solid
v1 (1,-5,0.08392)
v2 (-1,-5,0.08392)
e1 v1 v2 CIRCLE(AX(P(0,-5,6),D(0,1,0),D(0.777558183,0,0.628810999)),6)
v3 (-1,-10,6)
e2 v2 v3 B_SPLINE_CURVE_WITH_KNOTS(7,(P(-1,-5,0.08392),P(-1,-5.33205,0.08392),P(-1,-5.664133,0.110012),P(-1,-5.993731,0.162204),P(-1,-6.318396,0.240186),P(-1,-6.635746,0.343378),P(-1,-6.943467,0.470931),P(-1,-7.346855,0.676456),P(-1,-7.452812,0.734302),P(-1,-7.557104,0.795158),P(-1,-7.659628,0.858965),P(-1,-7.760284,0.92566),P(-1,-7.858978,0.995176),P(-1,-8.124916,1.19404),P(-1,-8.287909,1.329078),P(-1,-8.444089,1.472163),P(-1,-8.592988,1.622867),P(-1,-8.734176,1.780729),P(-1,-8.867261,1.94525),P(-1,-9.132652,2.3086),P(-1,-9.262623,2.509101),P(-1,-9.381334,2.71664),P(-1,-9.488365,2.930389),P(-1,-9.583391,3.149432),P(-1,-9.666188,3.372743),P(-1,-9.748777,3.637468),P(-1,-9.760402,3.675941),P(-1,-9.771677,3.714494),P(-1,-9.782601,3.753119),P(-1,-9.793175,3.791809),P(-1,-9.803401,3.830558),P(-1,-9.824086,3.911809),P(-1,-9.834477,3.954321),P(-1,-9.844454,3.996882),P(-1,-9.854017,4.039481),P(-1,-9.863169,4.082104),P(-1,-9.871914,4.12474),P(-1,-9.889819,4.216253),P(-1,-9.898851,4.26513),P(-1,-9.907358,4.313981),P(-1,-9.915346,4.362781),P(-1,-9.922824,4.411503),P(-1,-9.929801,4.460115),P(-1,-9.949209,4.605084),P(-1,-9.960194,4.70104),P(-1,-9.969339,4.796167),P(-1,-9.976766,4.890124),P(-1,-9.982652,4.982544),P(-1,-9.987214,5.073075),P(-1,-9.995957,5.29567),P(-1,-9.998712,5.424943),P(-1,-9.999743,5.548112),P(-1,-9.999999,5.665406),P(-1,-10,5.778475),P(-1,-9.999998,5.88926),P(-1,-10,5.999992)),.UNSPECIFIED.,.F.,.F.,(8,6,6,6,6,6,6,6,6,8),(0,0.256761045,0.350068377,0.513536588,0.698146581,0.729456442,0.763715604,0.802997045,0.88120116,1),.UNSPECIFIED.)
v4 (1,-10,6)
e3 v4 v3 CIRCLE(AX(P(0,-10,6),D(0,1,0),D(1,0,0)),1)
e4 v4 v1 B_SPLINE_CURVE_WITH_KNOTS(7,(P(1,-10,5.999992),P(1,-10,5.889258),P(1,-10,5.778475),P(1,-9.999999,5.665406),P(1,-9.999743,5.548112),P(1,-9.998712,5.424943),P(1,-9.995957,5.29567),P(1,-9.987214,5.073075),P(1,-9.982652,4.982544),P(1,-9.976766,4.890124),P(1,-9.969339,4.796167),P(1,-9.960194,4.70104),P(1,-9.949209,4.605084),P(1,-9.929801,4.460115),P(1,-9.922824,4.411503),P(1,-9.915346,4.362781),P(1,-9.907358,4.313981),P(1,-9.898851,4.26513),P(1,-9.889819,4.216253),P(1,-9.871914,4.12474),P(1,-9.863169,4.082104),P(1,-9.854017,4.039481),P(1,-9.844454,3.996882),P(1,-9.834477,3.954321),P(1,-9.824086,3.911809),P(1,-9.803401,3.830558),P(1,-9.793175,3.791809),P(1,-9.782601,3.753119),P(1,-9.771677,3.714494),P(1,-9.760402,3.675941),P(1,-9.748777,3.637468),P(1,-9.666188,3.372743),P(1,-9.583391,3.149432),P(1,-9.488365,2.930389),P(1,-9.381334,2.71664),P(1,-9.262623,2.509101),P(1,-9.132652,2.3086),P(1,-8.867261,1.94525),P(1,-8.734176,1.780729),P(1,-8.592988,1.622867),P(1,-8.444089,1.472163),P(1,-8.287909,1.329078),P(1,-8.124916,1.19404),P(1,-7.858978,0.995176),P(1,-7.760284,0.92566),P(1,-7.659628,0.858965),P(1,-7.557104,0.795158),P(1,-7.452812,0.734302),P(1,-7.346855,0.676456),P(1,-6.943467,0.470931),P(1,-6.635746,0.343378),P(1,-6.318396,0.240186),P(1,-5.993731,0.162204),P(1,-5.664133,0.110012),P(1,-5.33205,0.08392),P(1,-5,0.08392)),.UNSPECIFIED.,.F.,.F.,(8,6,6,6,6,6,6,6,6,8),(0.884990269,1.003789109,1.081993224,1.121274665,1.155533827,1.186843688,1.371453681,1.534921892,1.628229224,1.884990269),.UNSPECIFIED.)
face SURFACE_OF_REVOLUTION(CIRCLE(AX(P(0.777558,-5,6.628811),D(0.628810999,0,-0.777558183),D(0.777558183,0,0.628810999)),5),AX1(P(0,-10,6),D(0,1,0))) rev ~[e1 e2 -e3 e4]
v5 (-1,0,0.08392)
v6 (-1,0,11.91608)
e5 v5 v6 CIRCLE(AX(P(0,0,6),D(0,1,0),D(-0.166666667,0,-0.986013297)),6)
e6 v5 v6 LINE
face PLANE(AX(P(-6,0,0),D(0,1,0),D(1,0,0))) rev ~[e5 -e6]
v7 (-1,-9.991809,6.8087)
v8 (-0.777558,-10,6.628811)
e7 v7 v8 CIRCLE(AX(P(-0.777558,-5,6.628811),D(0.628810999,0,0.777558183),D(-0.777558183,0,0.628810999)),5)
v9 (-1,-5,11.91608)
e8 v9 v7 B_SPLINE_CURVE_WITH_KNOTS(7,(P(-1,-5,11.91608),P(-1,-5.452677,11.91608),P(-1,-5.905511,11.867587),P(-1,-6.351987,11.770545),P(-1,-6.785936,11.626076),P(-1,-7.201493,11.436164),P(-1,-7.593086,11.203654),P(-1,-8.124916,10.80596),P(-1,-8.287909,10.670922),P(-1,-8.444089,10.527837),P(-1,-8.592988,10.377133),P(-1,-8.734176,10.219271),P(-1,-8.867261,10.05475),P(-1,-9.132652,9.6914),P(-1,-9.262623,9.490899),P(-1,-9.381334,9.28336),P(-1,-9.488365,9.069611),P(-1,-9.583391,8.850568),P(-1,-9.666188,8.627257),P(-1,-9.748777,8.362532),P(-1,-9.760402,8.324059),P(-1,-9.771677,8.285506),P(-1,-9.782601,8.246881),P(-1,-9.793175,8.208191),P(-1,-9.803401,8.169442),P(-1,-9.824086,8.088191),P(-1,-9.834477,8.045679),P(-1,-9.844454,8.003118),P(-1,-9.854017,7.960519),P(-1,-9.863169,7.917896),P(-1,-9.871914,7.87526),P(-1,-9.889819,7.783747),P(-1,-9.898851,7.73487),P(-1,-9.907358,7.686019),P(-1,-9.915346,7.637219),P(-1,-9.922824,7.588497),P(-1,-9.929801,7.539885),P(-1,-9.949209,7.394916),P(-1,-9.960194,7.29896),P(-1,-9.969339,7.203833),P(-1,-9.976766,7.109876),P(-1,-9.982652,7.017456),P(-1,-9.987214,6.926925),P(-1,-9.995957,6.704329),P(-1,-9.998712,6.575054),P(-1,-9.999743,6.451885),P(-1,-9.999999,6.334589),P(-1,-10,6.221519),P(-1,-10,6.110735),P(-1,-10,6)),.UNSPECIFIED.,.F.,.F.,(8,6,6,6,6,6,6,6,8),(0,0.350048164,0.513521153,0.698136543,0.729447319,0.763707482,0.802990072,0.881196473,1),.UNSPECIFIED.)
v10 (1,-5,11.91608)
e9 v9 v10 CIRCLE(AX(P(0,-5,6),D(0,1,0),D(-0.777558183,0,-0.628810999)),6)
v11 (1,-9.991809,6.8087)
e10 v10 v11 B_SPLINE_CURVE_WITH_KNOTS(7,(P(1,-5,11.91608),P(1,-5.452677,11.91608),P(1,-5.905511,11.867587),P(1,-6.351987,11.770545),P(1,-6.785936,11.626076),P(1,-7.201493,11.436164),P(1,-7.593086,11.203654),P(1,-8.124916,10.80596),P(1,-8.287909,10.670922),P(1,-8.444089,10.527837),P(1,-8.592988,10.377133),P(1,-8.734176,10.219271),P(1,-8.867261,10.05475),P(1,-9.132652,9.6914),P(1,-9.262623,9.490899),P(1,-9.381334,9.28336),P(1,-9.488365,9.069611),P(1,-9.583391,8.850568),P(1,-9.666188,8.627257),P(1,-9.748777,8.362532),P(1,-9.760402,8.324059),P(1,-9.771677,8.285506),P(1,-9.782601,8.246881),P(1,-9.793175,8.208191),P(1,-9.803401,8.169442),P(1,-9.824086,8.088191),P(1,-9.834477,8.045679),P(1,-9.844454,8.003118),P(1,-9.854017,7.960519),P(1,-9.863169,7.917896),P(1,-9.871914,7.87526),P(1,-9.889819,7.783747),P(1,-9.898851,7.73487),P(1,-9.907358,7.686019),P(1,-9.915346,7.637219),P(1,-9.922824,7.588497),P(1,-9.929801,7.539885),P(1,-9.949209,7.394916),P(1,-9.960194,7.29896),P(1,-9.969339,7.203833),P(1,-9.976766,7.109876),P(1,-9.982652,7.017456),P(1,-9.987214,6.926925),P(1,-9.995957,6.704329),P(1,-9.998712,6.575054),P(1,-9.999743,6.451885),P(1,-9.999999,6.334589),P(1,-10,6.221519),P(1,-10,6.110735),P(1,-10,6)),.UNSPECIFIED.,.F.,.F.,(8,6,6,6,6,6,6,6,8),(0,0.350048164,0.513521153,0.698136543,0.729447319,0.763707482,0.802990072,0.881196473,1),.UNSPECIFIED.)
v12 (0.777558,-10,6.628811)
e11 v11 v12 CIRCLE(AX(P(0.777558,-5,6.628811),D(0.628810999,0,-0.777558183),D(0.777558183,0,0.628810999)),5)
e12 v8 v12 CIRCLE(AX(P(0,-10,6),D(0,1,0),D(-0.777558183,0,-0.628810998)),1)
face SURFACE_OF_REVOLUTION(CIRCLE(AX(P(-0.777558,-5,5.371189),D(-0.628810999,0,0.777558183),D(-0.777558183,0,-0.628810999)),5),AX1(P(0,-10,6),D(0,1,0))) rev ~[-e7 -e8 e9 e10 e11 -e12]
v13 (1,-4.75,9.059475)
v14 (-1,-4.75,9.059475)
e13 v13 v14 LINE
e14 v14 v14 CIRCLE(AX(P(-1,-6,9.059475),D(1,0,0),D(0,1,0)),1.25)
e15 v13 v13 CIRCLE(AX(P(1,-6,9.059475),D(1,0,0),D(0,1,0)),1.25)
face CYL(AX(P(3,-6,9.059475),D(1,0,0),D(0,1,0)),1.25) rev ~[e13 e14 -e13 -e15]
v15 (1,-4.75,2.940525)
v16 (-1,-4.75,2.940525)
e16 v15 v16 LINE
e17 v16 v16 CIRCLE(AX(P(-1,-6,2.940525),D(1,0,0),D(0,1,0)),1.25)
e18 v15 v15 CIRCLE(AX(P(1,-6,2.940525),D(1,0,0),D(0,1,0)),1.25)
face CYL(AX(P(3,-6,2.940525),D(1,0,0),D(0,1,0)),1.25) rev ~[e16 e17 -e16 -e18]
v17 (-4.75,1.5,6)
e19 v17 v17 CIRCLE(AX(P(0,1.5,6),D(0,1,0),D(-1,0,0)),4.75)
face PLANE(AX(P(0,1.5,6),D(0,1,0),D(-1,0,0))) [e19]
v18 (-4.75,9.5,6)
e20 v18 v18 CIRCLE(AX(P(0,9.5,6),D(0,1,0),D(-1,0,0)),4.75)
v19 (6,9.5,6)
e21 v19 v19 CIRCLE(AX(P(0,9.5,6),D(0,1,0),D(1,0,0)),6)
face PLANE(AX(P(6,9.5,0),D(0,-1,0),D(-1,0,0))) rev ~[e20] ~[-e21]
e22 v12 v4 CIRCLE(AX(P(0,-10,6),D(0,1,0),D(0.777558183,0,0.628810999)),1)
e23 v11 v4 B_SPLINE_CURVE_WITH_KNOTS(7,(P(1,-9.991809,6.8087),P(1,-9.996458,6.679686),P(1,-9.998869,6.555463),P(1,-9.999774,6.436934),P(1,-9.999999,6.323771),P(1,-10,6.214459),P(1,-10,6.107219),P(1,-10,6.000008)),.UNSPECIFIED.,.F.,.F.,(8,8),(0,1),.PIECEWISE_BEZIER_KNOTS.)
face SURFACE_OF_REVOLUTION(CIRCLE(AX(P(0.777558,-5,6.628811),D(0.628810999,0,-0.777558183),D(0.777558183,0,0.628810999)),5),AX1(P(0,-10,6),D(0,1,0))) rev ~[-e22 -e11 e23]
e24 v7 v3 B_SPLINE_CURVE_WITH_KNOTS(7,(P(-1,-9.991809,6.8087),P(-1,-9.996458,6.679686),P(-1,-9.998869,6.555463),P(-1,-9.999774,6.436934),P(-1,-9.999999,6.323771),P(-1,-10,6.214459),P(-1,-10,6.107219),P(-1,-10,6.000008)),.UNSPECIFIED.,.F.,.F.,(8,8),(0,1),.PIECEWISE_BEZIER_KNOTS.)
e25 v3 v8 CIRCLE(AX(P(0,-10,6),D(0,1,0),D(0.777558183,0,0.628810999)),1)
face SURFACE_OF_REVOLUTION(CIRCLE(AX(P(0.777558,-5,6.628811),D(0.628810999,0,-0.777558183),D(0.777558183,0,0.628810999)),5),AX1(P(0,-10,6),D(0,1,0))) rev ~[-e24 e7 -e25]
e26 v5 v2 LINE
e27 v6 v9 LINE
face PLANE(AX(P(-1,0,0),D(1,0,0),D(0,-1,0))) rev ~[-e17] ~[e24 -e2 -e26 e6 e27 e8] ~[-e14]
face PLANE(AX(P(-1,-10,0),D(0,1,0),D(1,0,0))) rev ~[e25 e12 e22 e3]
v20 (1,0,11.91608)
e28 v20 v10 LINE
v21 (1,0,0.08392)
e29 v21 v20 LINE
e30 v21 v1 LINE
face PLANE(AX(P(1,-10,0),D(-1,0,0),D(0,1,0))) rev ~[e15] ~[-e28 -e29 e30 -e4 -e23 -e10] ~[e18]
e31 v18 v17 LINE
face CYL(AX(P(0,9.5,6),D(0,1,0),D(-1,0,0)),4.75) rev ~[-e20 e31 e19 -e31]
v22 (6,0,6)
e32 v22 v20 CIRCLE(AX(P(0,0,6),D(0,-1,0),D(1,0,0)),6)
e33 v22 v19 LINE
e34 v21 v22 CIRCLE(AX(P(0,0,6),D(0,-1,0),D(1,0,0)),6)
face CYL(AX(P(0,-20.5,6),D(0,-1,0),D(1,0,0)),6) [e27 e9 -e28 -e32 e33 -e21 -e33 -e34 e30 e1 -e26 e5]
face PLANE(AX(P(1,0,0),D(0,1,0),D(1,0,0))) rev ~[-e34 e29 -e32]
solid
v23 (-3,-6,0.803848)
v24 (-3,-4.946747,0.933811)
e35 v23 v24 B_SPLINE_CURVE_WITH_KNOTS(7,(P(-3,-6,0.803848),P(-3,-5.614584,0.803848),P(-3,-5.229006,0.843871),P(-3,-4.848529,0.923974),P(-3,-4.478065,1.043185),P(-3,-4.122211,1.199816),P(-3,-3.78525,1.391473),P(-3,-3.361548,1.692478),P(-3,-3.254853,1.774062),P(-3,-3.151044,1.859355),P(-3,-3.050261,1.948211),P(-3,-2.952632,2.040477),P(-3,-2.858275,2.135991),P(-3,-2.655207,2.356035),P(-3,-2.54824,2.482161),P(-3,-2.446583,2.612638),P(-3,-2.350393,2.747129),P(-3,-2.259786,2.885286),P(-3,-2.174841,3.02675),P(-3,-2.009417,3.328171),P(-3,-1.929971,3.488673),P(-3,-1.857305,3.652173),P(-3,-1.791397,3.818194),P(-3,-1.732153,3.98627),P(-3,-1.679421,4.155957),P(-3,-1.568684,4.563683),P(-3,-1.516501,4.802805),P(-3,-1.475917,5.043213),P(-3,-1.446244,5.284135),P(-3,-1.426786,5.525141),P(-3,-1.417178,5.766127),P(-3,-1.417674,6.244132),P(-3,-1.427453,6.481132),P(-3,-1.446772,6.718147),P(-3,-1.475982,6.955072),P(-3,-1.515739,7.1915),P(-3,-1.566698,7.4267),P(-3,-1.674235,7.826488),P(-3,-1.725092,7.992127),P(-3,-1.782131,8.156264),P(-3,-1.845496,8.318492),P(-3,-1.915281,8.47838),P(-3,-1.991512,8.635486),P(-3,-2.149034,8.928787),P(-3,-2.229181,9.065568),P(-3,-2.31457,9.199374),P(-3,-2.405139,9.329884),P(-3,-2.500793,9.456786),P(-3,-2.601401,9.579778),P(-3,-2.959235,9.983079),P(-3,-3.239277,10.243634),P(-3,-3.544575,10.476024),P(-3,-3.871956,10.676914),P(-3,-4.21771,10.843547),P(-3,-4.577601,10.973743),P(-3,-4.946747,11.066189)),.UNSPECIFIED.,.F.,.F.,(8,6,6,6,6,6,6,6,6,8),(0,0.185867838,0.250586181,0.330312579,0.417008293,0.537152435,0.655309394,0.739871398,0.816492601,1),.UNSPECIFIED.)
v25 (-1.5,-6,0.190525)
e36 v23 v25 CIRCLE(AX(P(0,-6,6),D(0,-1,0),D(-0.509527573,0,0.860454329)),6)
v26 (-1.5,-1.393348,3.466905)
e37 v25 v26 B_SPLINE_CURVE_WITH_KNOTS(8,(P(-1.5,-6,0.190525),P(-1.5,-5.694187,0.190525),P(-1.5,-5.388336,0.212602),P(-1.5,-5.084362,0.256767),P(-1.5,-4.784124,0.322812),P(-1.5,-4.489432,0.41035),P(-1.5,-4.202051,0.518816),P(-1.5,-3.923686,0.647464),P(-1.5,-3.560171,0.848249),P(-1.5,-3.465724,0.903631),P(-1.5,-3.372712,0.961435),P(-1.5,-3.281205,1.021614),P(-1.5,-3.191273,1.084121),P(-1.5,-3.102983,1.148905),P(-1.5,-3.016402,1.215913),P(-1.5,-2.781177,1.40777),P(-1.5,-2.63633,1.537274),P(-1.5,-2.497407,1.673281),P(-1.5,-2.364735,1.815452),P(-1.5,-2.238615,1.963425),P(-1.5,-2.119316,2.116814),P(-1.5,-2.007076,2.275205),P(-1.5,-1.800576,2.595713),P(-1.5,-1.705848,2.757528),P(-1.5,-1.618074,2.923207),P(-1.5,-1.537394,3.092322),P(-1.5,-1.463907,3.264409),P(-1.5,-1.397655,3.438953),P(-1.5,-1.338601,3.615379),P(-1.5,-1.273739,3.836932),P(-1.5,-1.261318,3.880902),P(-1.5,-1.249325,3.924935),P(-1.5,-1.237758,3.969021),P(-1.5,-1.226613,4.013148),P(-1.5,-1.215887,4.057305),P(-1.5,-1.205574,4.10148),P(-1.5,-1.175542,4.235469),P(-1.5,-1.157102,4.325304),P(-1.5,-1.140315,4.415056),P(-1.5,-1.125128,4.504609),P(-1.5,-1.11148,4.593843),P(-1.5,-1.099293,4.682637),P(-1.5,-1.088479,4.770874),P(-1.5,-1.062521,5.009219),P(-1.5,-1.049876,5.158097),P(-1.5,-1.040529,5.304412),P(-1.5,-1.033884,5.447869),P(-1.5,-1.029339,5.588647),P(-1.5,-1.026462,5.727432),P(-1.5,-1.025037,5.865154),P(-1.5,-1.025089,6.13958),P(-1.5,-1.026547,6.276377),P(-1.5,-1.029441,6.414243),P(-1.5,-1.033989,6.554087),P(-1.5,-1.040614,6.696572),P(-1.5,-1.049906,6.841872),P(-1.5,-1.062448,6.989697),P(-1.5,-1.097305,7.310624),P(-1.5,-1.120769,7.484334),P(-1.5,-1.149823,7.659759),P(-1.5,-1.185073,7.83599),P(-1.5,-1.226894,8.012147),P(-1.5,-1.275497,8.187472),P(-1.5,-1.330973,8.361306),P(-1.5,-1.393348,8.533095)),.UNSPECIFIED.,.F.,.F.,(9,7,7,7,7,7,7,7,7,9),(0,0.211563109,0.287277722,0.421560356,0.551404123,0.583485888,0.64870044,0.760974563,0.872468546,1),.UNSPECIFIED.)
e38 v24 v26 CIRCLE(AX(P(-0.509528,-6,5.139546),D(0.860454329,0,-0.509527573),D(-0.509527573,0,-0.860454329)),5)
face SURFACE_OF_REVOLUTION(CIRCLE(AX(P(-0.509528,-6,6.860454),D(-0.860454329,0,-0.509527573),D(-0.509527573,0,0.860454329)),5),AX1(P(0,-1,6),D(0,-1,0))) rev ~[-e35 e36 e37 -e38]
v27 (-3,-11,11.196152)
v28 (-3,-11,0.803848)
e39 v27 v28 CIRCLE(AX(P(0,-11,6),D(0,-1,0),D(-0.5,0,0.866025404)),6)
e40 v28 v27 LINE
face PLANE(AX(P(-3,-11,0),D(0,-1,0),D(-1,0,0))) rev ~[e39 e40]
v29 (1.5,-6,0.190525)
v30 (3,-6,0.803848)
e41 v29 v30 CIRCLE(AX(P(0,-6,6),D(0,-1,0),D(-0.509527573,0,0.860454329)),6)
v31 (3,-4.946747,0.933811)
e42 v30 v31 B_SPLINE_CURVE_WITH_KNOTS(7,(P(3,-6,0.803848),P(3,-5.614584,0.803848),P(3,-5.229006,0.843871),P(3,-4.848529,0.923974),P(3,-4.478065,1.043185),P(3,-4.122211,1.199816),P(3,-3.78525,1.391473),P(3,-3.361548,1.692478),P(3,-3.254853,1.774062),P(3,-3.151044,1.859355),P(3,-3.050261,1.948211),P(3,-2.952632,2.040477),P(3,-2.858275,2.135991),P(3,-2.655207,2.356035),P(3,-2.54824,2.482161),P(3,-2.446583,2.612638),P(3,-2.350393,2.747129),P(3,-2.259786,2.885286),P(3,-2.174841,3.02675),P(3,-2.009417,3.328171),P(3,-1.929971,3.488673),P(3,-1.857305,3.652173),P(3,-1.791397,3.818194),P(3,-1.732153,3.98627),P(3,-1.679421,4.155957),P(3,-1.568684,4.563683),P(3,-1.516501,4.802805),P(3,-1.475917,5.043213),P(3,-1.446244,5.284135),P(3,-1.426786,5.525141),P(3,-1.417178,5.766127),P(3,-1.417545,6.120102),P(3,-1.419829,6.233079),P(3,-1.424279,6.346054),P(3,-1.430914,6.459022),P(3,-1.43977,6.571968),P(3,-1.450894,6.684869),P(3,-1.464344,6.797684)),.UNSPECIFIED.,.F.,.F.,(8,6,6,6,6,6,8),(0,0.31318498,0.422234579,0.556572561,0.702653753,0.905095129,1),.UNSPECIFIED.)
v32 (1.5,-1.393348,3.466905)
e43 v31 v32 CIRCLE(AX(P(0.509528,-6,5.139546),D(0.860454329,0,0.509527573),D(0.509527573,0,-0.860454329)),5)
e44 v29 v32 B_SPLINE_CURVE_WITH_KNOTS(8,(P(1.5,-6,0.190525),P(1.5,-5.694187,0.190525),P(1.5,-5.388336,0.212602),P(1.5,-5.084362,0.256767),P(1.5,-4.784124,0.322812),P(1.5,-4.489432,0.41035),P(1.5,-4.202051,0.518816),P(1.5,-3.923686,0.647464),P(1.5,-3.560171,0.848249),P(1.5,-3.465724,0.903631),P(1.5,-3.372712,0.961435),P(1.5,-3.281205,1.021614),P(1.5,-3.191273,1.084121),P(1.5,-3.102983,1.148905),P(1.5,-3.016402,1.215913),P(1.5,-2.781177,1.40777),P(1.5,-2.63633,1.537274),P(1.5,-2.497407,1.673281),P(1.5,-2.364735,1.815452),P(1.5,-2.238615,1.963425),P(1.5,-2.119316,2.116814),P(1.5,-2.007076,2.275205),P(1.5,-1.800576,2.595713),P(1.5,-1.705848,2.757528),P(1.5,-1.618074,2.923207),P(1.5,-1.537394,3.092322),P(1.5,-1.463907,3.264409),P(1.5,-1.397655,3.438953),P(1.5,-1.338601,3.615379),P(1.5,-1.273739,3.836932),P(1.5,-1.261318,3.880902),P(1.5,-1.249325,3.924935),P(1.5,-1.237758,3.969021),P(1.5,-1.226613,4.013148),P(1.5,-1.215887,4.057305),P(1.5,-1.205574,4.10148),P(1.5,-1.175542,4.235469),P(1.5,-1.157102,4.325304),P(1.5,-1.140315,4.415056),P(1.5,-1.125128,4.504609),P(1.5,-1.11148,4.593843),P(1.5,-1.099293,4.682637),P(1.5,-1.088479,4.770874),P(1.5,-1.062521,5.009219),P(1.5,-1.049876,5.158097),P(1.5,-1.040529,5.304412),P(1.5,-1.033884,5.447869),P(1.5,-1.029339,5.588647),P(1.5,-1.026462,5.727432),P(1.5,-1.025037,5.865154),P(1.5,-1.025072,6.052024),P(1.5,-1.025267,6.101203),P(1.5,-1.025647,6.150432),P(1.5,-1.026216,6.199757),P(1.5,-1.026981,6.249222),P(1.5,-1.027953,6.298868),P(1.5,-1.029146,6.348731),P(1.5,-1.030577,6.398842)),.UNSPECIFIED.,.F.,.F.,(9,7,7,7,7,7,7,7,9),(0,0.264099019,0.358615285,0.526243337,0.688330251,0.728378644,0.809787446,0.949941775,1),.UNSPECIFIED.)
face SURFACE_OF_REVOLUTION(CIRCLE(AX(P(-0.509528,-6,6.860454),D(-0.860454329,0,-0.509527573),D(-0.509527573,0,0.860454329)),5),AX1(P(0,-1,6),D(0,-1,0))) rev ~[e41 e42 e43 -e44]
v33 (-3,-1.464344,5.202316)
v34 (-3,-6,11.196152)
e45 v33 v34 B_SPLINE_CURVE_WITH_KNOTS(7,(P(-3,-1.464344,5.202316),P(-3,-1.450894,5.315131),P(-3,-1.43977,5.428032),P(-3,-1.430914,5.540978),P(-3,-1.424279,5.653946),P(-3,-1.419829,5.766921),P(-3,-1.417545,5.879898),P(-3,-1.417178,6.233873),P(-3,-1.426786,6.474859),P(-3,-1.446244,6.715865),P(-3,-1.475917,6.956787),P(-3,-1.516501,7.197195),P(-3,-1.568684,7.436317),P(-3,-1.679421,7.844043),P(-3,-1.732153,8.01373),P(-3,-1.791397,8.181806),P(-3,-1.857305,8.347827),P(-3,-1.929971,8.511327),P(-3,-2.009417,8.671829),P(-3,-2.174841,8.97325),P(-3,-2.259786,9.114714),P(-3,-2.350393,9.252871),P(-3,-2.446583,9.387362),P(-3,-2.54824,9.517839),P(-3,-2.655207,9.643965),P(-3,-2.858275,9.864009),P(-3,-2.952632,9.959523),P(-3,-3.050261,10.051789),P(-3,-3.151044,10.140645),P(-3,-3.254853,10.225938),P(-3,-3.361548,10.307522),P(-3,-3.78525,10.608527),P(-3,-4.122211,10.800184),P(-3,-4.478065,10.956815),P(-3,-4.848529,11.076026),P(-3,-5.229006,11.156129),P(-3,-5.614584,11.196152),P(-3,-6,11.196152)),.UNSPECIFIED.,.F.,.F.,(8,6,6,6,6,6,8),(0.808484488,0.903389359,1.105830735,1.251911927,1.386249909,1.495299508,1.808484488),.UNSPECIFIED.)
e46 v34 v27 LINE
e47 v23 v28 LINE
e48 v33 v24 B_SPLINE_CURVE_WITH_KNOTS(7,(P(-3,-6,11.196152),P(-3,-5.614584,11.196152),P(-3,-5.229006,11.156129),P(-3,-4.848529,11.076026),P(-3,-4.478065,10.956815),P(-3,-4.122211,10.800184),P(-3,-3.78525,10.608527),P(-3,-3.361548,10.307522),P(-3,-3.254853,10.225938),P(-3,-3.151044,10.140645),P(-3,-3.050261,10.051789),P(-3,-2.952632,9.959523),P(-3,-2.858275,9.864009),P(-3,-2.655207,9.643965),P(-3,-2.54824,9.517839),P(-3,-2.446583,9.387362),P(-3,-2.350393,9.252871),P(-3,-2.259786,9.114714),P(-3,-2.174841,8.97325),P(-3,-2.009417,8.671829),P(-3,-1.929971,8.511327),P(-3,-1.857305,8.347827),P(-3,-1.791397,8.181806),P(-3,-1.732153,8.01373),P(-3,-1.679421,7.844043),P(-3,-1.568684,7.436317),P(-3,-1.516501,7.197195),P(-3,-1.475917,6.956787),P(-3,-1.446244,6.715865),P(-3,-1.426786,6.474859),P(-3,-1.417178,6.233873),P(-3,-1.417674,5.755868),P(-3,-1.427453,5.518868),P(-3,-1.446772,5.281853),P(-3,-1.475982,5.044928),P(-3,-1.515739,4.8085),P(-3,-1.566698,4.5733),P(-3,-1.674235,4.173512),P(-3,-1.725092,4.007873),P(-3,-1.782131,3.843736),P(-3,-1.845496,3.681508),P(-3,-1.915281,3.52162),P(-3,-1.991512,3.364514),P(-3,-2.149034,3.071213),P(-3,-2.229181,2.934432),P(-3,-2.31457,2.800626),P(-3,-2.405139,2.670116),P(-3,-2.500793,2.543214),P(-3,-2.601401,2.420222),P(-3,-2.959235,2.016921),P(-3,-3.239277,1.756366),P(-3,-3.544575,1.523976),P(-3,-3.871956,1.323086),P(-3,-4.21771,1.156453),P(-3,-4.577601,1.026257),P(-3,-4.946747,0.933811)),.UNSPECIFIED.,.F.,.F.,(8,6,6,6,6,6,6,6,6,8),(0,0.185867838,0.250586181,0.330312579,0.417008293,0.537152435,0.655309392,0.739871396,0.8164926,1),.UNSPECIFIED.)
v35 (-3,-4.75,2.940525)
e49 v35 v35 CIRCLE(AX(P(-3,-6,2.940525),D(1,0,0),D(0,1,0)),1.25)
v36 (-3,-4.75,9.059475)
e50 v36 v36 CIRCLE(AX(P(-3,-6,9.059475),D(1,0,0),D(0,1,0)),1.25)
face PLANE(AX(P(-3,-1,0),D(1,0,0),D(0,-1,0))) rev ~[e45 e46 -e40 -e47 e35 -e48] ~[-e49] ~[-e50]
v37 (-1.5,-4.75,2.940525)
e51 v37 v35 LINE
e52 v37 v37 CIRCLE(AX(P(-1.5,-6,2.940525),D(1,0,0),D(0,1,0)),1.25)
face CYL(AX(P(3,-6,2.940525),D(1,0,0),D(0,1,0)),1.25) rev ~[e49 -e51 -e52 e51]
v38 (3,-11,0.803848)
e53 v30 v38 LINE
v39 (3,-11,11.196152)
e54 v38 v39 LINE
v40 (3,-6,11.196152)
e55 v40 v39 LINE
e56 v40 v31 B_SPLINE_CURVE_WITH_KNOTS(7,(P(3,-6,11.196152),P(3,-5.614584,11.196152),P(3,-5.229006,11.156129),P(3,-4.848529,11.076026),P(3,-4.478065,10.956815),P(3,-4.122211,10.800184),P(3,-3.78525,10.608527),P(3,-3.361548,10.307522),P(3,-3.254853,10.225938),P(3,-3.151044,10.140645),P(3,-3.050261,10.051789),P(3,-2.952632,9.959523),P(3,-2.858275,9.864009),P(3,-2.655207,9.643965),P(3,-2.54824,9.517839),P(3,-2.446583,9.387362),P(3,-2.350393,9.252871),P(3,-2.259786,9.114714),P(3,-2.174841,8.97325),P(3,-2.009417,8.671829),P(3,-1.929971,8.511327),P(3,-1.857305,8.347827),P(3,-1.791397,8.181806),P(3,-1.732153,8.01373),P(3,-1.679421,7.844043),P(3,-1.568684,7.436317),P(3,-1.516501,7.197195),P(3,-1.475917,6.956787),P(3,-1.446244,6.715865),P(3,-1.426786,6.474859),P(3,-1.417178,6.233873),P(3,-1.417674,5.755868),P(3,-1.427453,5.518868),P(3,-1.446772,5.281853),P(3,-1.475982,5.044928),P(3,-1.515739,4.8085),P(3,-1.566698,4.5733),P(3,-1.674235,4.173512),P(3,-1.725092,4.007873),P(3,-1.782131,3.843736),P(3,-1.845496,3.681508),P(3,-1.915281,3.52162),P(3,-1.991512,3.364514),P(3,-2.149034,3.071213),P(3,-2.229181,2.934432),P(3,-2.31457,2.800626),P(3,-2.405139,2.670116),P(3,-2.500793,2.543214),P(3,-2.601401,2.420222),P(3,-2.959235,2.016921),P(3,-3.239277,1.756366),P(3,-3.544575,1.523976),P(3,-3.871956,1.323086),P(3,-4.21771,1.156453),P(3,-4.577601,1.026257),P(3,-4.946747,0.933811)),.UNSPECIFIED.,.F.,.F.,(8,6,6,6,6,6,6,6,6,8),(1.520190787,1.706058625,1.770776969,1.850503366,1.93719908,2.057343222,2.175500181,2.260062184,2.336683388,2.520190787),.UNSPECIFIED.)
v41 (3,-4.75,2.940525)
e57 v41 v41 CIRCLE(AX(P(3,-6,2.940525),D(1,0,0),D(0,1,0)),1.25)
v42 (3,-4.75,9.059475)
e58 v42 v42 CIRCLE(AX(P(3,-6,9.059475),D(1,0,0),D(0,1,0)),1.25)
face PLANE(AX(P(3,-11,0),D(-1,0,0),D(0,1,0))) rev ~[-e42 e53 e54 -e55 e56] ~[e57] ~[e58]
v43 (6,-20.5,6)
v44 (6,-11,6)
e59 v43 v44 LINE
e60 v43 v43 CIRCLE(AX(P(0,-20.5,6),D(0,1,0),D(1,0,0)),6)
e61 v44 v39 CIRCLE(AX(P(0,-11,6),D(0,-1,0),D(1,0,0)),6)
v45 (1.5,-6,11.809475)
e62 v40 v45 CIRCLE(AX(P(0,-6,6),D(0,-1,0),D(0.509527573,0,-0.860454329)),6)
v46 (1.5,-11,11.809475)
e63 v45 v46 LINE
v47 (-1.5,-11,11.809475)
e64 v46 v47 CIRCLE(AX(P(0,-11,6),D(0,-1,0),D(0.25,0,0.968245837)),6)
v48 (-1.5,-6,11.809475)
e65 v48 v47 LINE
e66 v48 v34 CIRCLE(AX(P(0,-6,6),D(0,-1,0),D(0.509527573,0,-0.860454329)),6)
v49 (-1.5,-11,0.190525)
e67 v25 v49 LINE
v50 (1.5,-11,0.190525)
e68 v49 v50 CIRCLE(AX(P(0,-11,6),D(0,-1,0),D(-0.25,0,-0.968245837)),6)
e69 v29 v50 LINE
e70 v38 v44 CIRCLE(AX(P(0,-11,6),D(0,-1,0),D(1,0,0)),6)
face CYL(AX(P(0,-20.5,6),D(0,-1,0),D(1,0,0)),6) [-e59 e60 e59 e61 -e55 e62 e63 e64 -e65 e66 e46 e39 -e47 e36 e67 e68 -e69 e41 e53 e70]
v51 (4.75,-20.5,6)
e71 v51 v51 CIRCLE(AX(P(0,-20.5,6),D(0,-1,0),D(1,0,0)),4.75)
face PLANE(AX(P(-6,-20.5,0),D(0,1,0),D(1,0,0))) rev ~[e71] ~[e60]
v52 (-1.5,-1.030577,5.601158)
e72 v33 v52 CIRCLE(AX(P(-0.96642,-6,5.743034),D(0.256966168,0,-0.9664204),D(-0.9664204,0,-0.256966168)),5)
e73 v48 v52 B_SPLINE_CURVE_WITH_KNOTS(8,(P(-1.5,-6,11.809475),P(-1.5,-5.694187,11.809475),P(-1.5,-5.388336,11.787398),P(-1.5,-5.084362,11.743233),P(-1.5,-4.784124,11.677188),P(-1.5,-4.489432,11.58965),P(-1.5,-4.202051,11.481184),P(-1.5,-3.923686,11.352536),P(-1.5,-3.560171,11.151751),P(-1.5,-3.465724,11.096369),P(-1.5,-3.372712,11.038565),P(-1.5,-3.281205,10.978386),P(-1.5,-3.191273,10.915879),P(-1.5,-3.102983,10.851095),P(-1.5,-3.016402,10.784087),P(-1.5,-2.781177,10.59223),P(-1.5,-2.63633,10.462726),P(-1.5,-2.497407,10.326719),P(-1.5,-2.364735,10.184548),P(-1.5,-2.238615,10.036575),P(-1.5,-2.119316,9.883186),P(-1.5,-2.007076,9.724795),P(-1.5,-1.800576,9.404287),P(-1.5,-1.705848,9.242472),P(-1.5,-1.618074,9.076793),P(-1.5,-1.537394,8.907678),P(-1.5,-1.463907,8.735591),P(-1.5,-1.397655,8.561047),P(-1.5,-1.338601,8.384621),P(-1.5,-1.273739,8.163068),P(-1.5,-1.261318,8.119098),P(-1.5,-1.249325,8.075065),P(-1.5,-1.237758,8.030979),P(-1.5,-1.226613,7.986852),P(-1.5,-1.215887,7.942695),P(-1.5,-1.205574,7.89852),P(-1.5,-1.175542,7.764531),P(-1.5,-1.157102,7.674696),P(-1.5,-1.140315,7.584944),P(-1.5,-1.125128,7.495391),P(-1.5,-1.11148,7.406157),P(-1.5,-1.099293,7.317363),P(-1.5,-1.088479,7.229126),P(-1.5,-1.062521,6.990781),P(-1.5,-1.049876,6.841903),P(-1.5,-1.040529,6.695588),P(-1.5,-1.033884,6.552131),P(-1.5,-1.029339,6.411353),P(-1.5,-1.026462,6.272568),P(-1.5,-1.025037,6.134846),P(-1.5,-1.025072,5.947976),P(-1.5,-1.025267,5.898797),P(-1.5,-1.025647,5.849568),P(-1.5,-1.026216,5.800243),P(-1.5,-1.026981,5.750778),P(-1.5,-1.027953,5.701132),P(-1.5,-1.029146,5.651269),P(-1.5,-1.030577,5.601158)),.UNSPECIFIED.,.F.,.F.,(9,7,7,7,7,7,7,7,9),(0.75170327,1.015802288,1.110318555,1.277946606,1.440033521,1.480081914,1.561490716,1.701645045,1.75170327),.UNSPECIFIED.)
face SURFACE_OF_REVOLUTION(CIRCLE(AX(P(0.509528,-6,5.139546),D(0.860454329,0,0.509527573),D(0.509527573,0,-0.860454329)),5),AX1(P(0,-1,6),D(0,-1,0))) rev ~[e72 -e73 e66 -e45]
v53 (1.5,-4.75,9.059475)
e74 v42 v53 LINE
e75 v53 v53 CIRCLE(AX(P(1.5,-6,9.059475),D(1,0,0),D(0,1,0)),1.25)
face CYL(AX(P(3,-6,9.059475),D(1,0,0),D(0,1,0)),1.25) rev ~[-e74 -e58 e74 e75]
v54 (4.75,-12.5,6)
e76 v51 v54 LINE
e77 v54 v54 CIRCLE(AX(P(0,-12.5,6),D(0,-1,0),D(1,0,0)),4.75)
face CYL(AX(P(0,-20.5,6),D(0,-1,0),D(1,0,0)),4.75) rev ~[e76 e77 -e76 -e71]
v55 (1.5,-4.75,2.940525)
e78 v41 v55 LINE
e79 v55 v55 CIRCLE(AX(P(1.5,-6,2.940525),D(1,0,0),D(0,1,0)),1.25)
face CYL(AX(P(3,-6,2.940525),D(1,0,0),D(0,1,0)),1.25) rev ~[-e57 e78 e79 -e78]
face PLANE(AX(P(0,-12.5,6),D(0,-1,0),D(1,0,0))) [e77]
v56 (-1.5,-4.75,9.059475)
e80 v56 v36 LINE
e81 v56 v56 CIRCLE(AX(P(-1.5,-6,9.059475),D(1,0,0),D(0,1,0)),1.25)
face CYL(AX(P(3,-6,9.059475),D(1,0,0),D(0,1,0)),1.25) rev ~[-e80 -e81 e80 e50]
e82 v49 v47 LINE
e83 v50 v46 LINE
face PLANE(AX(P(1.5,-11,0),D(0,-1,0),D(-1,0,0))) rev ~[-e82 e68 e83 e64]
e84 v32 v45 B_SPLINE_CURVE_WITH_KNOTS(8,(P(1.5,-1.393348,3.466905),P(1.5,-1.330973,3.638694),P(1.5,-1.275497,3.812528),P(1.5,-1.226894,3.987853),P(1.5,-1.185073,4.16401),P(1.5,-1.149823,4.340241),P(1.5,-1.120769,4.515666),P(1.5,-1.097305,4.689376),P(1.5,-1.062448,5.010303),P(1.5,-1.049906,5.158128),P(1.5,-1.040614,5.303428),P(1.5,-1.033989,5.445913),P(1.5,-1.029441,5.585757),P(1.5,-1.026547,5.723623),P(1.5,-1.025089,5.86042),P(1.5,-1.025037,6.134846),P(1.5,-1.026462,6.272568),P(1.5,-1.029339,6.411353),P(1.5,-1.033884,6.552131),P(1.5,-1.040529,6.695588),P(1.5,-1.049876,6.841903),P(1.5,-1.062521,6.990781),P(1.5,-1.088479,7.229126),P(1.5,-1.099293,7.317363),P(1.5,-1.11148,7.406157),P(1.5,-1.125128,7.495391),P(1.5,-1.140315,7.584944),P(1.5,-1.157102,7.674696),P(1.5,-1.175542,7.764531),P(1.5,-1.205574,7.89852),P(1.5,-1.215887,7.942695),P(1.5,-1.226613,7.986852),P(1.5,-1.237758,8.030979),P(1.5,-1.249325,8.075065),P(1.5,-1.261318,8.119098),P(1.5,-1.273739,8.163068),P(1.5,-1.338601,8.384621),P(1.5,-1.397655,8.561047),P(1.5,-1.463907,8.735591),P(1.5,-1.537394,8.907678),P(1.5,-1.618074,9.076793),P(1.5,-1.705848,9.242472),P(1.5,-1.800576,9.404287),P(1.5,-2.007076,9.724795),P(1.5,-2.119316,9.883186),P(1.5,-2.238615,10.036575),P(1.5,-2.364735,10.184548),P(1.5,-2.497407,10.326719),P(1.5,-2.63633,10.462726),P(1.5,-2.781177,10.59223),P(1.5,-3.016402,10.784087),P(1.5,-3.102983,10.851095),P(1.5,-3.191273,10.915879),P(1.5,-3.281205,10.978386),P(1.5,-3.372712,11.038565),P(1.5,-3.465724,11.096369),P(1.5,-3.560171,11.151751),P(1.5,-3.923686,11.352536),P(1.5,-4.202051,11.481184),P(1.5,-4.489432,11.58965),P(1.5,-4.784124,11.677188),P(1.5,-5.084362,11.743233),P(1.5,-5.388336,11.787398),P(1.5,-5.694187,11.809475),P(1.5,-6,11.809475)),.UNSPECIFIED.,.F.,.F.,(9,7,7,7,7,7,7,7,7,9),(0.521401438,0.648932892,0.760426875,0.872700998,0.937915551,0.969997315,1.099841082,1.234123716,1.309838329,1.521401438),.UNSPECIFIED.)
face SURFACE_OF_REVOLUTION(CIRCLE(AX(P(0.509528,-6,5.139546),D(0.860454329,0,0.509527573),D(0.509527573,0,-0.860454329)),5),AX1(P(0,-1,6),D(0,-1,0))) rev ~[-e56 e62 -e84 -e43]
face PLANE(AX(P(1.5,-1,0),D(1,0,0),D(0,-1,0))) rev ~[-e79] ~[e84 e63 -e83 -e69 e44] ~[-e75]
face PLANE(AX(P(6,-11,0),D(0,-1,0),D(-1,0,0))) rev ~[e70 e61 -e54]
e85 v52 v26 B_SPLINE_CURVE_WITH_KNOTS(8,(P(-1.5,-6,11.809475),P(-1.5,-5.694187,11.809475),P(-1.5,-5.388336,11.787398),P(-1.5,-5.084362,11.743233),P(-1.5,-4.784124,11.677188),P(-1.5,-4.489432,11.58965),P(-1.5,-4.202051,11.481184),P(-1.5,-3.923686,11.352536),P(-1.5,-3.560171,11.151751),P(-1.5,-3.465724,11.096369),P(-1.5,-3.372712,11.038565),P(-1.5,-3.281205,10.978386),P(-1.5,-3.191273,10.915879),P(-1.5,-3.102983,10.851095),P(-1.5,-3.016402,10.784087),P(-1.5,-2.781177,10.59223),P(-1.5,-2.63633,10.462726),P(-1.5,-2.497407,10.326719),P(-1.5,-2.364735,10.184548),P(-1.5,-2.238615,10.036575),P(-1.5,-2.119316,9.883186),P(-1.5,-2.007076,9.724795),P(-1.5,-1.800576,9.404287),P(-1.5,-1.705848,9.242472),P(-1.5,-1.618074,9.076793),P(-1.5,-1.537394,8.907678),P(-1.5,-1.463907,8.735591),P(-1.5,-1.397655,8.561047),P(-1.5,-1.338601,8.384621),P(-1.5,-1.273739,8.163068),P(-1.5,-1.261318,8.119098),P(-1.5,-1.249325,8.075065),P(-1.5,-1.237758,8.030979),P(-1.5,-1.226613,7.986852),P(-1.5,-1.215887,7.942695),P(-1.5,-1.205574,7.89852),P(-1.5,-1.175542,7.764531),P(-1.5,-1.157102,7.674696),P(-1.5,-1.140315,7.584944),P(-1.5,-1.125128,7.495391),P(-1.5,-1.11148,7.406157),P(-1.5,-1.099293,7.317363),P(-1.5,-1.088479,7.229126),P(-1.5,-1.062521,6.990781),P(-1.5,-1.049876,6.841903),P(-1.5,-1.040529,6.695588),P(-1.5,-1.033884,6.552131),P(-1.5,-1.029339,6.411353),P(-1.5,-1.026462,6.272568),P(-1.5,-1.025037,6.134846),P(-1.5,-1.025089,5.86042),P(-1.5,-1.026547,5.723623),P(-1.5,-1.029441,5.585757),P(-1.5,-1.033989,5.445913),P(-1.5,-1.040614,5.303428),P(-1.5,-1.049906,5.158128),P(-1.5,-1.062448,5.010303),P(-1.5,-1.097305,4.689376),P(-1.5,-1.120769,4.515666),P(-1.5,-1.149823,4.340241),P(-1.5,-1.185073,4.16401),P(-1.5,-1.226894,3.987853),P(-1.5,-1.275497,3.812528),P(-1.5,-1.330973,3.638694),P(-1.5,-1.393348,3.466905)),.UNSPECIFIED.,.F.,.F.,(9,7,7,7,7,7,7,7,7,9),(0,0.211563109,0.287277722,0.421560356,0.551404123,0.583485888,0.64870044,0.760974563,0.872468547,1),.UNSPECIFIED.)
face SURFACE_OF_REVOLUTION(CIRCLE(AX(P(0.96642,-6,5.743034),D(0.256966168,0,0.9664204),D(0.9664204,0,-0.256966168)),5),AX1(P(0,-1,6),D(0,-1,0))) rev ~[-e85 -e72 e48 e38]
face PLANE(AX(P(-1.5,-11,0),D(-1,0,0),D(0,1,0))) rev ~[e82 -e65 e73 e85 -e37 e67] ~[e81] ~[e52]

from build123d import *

# Parameters (mm, degrees)
F1_DEPTH       = 12
F2_W           = 18.0606292561
F2_H           = 16.2687138654
F2_R           = 6
F3_DEPTH       = 35.7
F4_R           = 1.25
F5_DEPTH       = 25
F6_R           = 4.75
F7_DEPTH       = 8
F8_R           = 4.75
F9_DEPTH       = 8
F10_T2_ANGLE   = 257.9249090799
F10_T4_ANGLE   = 257.9249090799
F10_2_T2_ANGLE = 254.2577543973
F10_2_T4_ANGLE = 254.2577543973
F10_2_T6_ANGLE = 254.2577543973
F10_2_T8_ANGLE = 254.2577543973
F12_R          = 1.25
F13_DEPTH      = 15


# Not quite as in the source:
# - a fillet or chamfer that OpenCascade refuses, or shapes differently, is made with other operations: its cross-section is extruded or revolved along the edge and cut away or added
# - two fillets or chamfers of one size are made in one step


with BuildPart() as f1:
    # F0 (on Top) → F1 (new body)
    with BuildSketch(Plane.XY):
        Polygon((6, 9.5), (-6, 9.5), (-6, 0), (-1, 0), (-1, -10), (1, -10), (1, 0), (6, 0), align=None)
    extrude(amount=F1_DEPTH)


with BuildPart() as f1b:
    # F0 (on Top) → F1, piece 2 (new body)
    with BuildSketch(Plane.XY):
        Polygon((-6, -11), (-6, -20.5), (6, -20.5), (6, -11), (3, -11), (3, -1), (1.5, -1), (1.5, -11), (-1.5, -11), (-1.5, -1), (-3, -1), (-3, -11), align=None)
    extrude(amount=F1_DEPTH)


with BuildPart() as f3_tool:
    # F2 (on face) → F3 (new body)
    with BuildSketch(Plane.XZ.offset(20.5)):
        with Locations((0.2045785077, 5.5509812664)):
            Rectangle(F2_W, F2_H)
        with Locations((0, 6)):
            Circle(F2_R, mode=Mode.SUBTRACT)
    extrude(amount=-F3_DEPTH)


with BuildPart() as f1_1:
    add(f1.part)

    # F3: cut by f3_tool
    add(f3_tool.part, mode=Mode.SUBTRACT)


with BuildPart() as f1b_1:
    add(f1b.part)

    # F3: cut by f3_tool
    add(f3_tool.part, mode=Mode.SUBTRACT)


with BuildPart() as f5_tool:
    # F4 (on face) → F5 (new body)
    with BuildSketch(Plane.YZ.offset(3)):
        with Locations((-6, 2.9405249807)):
            Circle(F4_R)
    extrude(amount=-F5_DEPTH)


with BuildPart() as f1_2:
    add(f1_1.part)

    # F5: cut by f5_tool
    add(f5_tool.part, mode=Mode.SUBTRACT)

    # F8 (on face) → F9 (cut)
    with BuildSketch(Plane(origin=(0, 9.5, 0), x_dir=(-1, 0, 0), z_dir=(0, 1, 0))):
        with Locations((0, 6)):
            Circle(F8_R)
    extrude(amount=-F9_DEPTH, mode=Mode.SUBTRACT)

    # F10: fillet of radius 5 on 2 edges, made by hand

    # F10_s1 → F10_t2 (revolve, cut)
    with BuildSketch(Plane(origin=(-2.9336228252, 0, 3.6275803689), x_dir=(0, 1, 0), z_dir=(-0.6288109985, 0, 0.7775581831))):
        with BuildLine():
            ThreePointArc((-5, -9.7728659911), (-8.5355339059, -8.308399897), (-10, -4.7728659911))
            Line((-10, -4.7728659911), (-10, -9.7728659911))
            Line((-10, -9.7728659911), (-5, -9.7728659911))
        make_face()
    revolve(axis=Axis((0, -10, 6), (0, 1, 0)), revolution_arc=F10_T2_ANGLE, mode=Mode.SUBTRACT)

    # F10_s3 → F10_t4 (revolve, cut)
    with BuildSketch(Plane(origin=(-2.9336228252, 0, 3.6275803689), x_dir=(0, 1, 0), z_dir=(0.6288109985, 0, -0.7775581831))):
        with BuildLine():
            ThreePointArc((-5, -2.2271340089), (-8.5355339059, -0.7626679148), (-10, 2.7728659911))
            Line((-10, 2.7728659911), (-10, -2.2271340089))
            Line((-10, -2.2271340089), (-5, -2.2271340089))
        make_face()
    revolve(axis=Axis((0, -10, 6), (0, 1, 0)), revolution_arc=F10_T4_ANGLE, mode=Mode.SUBTRACT)


with BuildPart() as f1b_2:
    add(f1b_1.part)

    # F5: cut by f5_tool
    add(f5_tool.part, mode=Mode.SUBTRACT)

    # F6 (on face) → F7 (cut)
    with BuildSketch(Plane.XZ.offset(20.5)):
        with Locations((0, 6)):
            Circle(F6_R)
    extrude(amount=-F7_DEPTH, mode=Mode.SUBTRACT)

    # F10#2: fillet of radius 5 on 4 edges, made by hand

    # F10_2_s1 → F10_2_t2 (revolve, cut)
    with BuildSketch(Plane(origin=(2.6305512341, 0, 1.5577100829), x_dir=(0, 1, 0), z_dir=(-0.8604543293, 0, -0.5095275725))):
        with BuildLine():
            ThreePointArc((-6, 0.8372740241), (-2.4644660941, -0.62719207), (-1, -4.1627259759))
            Line((-1, -4.1627259759), (-1, 0.8372740241))
            Line((-1, 0.8372740241), (-6, 0.8372740241))
        make_face()
    revolve(axis=Axis((0, -1, 6), (0, -1, 0)), revolution_arc=F10_2_T2_ANGLE, mode=Mode.SUBTRACT)

    # F10_2_s3 → F10_2_t4 (revolve, cut)
    with BuildSketch(Plane(origin=(1.4900240777, 0, 5.6038103325), x_dir=(0, 1, 0), z_dir=(-0.2569661675, 0, -0.9664203996))):
        with BuildLine():
            ThreePointArc((-6, 4.4582029949), (-2.4644660941, 2.9937369009), (-1, -0.5417970051))
            Line((-1, -0.5417970051), (-1, 4.4582029949))
            Line((-1, 4.4582029949), (-6, 4.4582029949))
        make_face()
    revolve(axis=Axis((0, -1, 6), (0, -1, 0)), revolution_arc=F10_2_T4_ANGLE, mode=Mode.SUBTRACT)

    # F10_2_s5 → F10_2_t6 (revolve, cut)
    with BuildSketch(Plane(origin=(2.6305512341, 0, 1.5577100829), x_dir=(0, 1, 0), z_dir=(0.8604543293, 0, 0.5095275725))):
        with BuildLine():
            ThreePointArc((-6, 11.1627259759), (-2.4644660941, 9.6982598818), (-1, 6.1627259759))
            Line((-1, 6.1627259759), (-1, 11.1627259759))
            Line((-1, 11.1627259759), (-6, 11.1627259759))
        make_face()
    revolve(axis=Axis((0, -1, 6), (0, -1, 0)), revolution_arc=F10_2_T6_ANGLE, mode=Mode.SUBTRACT)

    # F10_2_s7 → F10_2_t8 (revolve, cut)
    with BuildSketch(Plane(origin=(1.4900240777, 0, 5.6038103325), x_dir=(0, 1, 0), z_dir=(0.2569661675, 0, 0.9664203996))):
        with BuildLine():
            ThreePointArc((-6, 7.5417970051), (-2.4644660941, 6.077330911), (-1, 2.5417970051))
            Line((-1, 2.5417970051), (-1, 7.5417970051))
            Line((-1, 7.5417970051), (-6, 7.5417970051))
        make_face()
    revolve(axis=Axis((0, -1, 6), (0, -1, 0)), revolution_arc=F10_2_T8_ANGLE, mode=Mode.SUBTRACT)


with BuildPart() as f13_tool:
    # F12 (on face) → F13 (new body)
    with BuildSketch(Plane.YZ.offset(3)):
        with Locations((-6, 9.0594750193)):
            Circle(F12_R)
    extrude(amount=-F13_DEPTH)


with BuildPart() as f1_3:
    add(f1_2.part)

    # F13: cut by f13_tool
    add(f13_tool.part, mode=Mode.SUBTRACT)


with BuildPart() as f1b_3:
    add(f1b_2.part)

    # F13: cut by f13_tool
    add(f13_tool.part, mode=Mode.SUBTRACT)


solid = Compound([f1_3.part, f1b_3.part])
